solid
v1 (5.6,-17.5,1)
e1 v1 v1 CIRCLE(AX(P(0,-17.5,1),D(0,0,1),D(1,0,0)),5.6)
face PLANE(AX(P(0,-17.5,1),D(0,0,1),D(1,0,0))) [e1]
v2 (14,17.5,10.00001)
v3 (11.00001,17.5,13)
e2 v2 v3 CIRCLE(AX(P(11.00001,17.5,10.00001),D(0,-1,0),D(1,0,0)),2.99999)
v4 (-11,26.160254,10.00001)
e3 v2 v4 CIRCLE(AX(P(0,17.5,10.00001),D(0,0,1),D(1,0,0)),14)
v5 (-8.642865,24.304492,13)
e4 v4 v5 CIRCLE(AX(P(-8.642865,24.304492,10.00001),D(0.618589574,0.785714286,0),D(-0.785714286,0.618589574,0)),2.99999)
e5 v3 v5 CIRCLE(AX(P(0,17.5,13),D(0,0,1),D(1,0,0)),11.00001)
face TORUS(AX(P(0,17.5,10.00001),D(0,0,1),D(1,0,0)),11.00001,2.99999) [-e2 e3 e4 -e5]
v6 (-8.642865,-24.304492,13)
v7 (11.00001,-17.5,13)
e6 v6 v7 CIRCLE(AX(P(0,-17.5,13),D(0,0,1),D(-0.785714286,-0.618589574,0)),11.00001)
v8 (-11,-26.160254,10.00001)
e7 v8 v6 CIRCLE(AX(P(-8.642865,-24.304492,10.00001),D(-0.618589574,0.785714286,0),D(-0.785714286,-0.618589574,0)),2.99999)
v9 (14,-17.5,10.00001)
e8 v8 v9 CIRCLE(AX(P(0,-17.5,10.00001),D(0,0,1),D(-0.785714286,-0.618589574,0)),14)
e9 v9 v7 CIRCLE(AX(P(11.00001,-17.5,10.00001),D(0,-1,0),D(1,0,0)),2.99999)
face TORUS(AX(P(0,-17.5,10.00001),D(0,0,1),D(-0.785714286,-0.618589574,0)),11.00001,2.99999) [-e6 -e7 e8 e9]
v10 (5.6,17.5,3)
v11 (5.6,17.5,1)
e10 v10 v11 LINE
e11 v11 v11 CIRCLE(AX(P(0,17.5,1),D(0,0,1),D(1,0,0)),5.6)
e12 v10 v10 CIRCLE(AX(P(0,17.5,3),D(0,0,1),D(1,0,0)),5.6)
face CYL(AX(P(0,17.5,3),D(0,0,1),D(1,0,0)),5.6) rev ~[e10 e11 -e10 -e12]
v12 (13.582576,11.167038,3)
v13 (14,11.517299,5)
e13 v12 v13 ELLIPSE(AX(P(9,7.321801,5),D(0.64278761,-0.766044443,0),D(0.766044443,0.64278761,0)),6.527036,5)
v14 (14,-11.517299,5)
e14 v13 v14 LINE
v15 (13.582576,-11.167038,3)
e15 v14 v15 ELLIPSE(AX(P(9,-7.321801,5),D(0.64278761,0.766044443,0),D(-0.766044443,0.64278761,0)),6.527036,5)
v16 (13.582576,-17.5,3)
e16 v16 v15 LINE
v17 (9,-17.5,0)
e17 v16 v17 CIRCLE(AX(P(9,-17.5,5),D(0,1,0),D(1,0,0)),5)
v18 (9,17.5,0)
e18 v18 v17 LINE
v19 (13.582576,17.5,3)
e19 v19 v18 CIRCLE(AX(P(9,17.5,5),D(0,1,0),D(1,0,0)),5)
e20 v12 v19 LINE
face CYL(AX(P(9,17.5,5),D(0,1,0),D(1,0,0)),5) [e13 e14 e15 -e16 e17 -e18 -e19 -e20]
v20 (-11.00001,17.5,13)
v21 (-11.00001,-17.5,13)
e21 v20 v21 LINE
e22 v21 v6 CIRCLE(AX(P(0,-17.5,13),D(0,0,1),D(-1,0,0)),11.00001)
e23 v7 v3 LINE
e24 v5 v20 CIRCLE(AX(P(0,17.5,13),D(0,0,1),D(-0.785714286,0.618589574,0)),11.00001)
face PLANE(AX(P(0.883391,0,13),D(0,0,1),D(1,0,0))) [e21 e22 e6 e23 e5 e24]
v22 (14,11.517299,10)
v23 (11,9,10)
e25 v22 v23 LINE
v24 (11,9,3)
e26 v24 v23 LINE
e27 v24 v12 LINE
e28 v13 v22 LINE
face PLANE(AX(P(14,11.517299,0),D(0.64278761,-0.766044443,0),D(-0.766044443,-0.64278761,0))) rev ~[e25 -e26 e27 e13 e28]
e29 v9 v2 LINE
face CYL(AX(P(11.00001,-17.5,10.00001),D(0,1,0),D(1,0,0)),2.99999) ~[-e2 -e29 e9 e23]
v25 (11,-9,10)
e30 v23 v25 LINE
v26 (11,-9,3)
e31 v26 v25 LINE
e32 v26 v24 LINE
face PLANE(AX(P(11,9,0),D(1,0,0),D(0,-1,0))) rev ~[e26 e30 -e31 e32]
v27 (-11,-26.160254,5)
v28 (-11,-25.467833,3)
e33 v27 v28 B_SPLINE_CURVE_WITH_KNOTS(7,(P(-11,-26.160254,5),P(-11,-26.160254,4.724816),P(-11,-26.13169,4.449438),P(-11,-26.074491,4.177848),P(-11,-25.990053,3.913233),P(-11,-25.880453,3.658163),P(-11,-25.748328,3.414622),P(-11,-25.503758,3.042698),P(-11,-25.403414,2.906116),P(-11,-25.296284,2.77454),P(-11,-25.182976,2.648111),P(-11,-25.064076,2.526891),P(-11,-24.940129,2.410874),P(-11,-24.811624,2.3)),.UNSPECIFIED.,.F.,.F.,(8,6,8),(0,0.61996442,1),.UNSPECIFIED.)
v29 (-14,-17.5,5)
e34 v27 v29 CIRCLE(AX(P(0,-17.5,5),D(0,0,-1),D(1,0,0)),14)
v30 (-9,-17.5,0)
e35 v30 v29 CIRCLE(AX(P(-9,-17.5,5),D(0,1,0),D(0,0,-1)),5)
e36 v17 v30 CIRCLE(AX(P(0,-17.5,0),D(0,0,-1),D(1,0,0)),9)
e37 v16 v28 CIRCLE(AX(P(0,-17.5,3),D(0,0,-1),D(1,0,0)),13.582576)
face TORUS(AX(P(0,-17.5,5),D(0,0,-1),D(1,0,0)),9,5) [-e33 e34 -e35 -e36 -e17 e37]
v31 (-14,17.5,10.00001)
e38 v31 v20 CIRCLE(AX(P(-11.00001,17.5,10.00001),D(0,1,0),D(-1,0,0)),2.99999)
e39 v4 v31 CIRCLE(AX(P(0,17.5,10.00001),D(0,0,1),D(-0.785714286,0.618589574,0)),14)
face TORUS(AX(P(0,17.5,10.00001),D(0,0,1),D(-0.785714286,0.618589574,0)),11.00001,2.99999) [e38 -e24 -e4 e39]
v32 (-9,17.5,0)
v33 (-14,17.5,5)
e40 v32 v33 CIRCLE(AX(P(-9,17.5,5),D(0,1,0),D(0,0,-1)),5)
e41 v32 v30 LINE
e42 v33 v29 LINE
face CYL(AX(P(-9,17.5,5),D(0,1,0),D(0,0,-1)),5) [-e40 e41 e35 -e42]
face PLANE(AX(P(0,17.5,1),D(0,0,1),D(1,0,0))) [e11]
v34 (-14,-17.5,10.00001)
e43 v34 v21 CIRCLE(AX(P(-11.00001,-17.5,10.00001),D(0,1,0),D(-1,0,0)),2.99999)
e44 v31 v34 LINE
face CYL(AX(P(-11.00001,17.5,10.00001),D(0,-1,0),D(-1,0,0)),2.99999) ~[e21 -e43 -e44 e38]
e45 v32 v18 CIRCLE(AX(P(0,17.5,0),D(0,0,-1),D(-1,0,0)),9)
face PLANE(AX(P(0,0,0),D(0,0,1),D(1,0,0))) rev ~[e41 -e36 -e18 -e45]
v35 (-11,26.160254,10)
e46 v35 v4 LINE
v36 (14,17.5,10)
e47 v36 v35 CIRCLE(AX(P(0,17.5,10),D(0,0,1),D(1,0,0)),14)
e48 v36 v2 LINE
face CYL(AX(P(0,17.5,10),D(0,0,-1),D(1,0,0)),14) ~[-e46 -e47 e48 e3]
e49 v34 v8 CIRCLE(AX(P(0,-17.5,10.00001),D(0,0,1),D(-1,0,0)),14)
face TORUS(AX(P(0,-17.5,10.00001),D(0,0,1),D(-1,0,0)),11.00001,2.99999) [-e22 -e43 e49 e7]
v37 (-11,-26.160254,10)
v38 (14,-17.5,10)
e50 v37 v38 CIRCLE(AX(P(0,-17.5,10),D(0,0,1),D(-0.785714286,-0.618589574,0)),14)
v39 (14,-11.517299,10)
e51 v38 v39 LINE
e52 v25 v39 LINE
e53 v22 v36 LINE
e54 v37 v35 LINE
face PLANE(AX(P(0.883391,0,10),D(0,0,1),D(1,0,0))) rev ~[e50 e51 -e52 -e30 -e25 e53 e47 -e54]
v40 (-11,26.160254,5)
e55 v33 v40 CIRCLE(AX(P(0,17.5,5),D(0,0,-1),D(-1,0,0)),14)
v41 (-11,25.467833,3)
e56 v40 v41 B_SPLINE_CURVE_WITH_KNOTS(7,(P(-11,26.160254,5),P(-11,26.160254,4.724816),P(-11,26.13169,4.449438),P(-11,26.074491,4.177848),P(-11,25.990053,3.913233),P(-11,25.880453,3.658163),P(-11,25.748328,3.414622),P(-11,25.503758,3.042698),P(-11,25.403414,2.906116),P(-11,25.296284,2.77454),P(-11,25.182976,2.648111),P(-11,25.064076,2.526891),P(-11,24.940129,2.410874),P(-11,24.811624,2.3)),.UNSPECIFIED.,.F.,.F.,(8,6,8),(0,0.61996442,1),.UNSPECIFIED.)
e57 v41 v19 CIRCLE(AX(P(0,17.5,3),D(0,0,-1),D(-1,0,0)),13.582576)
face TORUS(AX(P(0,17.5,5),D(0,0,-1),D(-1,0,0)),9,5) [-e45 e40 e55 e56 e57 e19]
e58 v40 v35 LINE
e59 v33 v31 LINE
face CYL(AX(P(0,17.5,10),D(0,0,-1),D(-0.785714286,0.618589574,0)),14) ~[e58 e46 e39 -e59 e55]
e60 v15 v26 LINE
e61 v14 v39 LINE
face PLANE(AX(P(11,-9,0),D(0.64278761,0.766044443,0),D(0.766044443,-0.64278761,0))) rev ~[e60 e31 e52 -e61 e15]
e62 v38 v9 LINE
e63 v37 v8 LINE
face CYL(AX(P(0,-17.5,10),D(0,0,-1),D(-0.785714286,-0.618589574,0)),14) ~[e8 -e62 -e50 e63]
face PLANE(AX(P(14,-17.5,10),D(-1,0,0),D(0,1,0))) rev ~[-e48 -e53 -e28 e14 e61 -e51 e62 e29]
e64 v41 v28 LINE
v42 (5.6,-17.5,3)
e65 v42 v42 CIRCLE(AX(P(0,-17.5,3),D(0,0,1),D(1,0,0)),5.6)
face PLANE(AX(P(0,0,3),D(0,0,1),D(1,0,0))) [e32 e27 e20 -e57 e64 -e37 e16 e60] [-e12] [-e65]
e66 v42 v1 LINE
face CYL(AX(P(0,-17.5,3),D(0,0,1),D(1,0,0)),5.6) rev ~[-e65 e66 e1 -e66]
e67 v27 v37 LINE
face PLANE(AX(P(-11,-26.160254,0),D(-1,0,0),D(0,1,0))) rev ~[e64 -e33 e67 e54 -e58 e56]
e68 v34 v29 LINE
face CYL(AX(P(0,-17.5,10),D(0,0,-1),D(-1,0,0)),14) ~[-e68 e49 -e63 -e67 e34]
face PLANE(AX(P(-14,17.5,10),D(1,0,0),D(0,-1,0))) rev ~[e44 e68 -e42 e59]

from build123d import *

# Parameters (mm, degrees)
F1_DEPTH    = 3
F2_R        = 5.6
F3_DEPTH    = 2
F5_DEPTH    = 10
F7_DEPTH    = 3
F8_R        = 2.99999
F9_T1_DEPTH = 35
F9_T4_ANGLE = 180
F9_T6_ANGLE = 180


# Not quite as in the source:
# - a fillet or chamfer that OpenCascade refuses, or shapes differently, is made with other operations: its cross-section is extruded or revolved along the edge and cut away or added
# - a fillet or chamfer is up to 0.001 mm smaller than in the source, because OpenCascade refuses the exact size


with BuildPart() as f1:
    # F0 (on Top) → F1 (new body)
    with BuildSketch(Plane.XY):
        with BuildLine():
            Line((14, -17.5), (14, 17.5))
            ThreePointArc((14, 17.5), (0, 31.5), (-14, 17.5))
            Line((-14, 17.5), (-14, -17.5))
            ThreePointArc((-14, -17.5), (0, -31.5), (14, -17.5))
        make_face()
    extrude(amount=F1_DEPTH)

    # F2 (on face) → F3 (cut)
    with BuildSketch(Plane.XY.offset(3)):
        with Locations((0, 17.5)):
            Circle(F2_R)
        with Locations((0, -17.5)):
            Circle(F2_R)
    extrude(amount=-F3_DEPTH, mode=Mode.SUBTRACT)

    # F4 (on Top) → F5 (join)
    with BuildSketch(Plane.XY):
        with BuildLine():
            Line((-11, -26.1602540378), (-11, 26.1602540378))
            ThreePointArc((-11, 26.1602540378), (-13.2287565553, 22.082575695), (-14, 17.5))
            Line((-14, 17.5), (-14, -17.5))
            ThreePointArc((-14, -17.5), (-13.2287565553, -22.082575695), (-11, -26.1602540378))
        make_face()
        Polygon((14, -11.5172988935), (14, 11.5172988935), (11, 9), (11, -9), align=None)
    extrude(amount=F5_DEPTH)

    # F6 (on face) → F7 (join)
    with BuildSketch(Plane.XY.offset(10)):
        with BuildLine():
            Line((14, -17.5), (14, 17.5))
            ThreePointArc((14, 17.5), (4.582575695, 30.7287565553), (-11, 26.1602540378))
            Line((-11, 26.1602540378), (-11, -26.1602540378))
            ThreePointArc((-11, -26.1602540378), (4.582575695, -30.7287565553), (14, -17.5))
        make_face()
        with BuildLine():
            Line((-11, -26.1602540378), (-11, 26.1602540378))
            ThreePointArc((-11, 26.1602540378), (-13.2287565553, 22.082575695), (-14, 17.5))
            Line((-14, 17.5), (-14, -17.5))
            ThreePointArc((-14, -17.5), (-13.2287565553, -22.082575695), (-11, -26.1602540378))
        make_face()
    extrude(amount=F7_DEPTH)

    # F8 (radius 3 in the source; OpenCascade refuses exactly that, so slightly less here)
    f8_edges = [f1.edges().sort_by_distance(p)[0] for p in [
        (14, 0, 13),
        (0, 31.5, 13),
        (-14, 0, 13),
        (0, -31.5, 13),
    ]]
    fillet(f8_edges, radius=F8_R)

    # F9: fillet of radius 5 on 4 edges, made by hand

    # F9_s2 → F9_t1 (cut)
    with BuildSketch(Plane.XZ.offset(-17.5)):
        with BuildLine():
            ThreePointArc((14, 5), (12.5355339059, 1.4644660941), (9, 0))
            Line((9, 0), (14, 0))
            Line((14, 0), (14, 5))
        make_face()
        with BuildLine():
            ThreePointArc((-9, 0), (-12.5355339059, 1.4644660941), (-14, 5))
            Line((-14, 5), (-14, 0))
            Line((-14, 0), (-9, 0))
        make_face()
    extrude(amount=F9_T1_DEPTH, mode=Mode.SUBTRACT)

    # F9_s3 → F9_t4 (revolve, cut)
    with BuildSketch(Plane.XZ.offset(17.5)):
        with BuildLine():
            ThreePointArc((14, 5), (12.5355339059, 1.4644660941), (9, 0))
            Line((9, 0), (14, 0))
            Line((14, 0), (14, 5))
        make_face()
    revolve(axis=Axis((0, -17.5, 0), (0, 0, -1)), revolution_arc=F9_T4_ANGLE, mode=Mode.SUBTRACT)

    # F9_s5 → F9_t6 (revolve, cut)
    with BuildSketch(Plane.XZ.offset(-17.5)):
        with BuildLine():
            ThreePointArc((-14, 5), (-12.5355339059, 1.4644660941), (-9, 0))
            Line((-9, 0), (-14, 0))
            Line((-14, 0), (-14, 5))
        make_face()
    revolve(axis=Axis((0, 17.5, 0), (0, 0, -1)), revolution_arc=F9_T6_ANGLE, mode=Mode.SUBTRACT)


solid = f1.part
